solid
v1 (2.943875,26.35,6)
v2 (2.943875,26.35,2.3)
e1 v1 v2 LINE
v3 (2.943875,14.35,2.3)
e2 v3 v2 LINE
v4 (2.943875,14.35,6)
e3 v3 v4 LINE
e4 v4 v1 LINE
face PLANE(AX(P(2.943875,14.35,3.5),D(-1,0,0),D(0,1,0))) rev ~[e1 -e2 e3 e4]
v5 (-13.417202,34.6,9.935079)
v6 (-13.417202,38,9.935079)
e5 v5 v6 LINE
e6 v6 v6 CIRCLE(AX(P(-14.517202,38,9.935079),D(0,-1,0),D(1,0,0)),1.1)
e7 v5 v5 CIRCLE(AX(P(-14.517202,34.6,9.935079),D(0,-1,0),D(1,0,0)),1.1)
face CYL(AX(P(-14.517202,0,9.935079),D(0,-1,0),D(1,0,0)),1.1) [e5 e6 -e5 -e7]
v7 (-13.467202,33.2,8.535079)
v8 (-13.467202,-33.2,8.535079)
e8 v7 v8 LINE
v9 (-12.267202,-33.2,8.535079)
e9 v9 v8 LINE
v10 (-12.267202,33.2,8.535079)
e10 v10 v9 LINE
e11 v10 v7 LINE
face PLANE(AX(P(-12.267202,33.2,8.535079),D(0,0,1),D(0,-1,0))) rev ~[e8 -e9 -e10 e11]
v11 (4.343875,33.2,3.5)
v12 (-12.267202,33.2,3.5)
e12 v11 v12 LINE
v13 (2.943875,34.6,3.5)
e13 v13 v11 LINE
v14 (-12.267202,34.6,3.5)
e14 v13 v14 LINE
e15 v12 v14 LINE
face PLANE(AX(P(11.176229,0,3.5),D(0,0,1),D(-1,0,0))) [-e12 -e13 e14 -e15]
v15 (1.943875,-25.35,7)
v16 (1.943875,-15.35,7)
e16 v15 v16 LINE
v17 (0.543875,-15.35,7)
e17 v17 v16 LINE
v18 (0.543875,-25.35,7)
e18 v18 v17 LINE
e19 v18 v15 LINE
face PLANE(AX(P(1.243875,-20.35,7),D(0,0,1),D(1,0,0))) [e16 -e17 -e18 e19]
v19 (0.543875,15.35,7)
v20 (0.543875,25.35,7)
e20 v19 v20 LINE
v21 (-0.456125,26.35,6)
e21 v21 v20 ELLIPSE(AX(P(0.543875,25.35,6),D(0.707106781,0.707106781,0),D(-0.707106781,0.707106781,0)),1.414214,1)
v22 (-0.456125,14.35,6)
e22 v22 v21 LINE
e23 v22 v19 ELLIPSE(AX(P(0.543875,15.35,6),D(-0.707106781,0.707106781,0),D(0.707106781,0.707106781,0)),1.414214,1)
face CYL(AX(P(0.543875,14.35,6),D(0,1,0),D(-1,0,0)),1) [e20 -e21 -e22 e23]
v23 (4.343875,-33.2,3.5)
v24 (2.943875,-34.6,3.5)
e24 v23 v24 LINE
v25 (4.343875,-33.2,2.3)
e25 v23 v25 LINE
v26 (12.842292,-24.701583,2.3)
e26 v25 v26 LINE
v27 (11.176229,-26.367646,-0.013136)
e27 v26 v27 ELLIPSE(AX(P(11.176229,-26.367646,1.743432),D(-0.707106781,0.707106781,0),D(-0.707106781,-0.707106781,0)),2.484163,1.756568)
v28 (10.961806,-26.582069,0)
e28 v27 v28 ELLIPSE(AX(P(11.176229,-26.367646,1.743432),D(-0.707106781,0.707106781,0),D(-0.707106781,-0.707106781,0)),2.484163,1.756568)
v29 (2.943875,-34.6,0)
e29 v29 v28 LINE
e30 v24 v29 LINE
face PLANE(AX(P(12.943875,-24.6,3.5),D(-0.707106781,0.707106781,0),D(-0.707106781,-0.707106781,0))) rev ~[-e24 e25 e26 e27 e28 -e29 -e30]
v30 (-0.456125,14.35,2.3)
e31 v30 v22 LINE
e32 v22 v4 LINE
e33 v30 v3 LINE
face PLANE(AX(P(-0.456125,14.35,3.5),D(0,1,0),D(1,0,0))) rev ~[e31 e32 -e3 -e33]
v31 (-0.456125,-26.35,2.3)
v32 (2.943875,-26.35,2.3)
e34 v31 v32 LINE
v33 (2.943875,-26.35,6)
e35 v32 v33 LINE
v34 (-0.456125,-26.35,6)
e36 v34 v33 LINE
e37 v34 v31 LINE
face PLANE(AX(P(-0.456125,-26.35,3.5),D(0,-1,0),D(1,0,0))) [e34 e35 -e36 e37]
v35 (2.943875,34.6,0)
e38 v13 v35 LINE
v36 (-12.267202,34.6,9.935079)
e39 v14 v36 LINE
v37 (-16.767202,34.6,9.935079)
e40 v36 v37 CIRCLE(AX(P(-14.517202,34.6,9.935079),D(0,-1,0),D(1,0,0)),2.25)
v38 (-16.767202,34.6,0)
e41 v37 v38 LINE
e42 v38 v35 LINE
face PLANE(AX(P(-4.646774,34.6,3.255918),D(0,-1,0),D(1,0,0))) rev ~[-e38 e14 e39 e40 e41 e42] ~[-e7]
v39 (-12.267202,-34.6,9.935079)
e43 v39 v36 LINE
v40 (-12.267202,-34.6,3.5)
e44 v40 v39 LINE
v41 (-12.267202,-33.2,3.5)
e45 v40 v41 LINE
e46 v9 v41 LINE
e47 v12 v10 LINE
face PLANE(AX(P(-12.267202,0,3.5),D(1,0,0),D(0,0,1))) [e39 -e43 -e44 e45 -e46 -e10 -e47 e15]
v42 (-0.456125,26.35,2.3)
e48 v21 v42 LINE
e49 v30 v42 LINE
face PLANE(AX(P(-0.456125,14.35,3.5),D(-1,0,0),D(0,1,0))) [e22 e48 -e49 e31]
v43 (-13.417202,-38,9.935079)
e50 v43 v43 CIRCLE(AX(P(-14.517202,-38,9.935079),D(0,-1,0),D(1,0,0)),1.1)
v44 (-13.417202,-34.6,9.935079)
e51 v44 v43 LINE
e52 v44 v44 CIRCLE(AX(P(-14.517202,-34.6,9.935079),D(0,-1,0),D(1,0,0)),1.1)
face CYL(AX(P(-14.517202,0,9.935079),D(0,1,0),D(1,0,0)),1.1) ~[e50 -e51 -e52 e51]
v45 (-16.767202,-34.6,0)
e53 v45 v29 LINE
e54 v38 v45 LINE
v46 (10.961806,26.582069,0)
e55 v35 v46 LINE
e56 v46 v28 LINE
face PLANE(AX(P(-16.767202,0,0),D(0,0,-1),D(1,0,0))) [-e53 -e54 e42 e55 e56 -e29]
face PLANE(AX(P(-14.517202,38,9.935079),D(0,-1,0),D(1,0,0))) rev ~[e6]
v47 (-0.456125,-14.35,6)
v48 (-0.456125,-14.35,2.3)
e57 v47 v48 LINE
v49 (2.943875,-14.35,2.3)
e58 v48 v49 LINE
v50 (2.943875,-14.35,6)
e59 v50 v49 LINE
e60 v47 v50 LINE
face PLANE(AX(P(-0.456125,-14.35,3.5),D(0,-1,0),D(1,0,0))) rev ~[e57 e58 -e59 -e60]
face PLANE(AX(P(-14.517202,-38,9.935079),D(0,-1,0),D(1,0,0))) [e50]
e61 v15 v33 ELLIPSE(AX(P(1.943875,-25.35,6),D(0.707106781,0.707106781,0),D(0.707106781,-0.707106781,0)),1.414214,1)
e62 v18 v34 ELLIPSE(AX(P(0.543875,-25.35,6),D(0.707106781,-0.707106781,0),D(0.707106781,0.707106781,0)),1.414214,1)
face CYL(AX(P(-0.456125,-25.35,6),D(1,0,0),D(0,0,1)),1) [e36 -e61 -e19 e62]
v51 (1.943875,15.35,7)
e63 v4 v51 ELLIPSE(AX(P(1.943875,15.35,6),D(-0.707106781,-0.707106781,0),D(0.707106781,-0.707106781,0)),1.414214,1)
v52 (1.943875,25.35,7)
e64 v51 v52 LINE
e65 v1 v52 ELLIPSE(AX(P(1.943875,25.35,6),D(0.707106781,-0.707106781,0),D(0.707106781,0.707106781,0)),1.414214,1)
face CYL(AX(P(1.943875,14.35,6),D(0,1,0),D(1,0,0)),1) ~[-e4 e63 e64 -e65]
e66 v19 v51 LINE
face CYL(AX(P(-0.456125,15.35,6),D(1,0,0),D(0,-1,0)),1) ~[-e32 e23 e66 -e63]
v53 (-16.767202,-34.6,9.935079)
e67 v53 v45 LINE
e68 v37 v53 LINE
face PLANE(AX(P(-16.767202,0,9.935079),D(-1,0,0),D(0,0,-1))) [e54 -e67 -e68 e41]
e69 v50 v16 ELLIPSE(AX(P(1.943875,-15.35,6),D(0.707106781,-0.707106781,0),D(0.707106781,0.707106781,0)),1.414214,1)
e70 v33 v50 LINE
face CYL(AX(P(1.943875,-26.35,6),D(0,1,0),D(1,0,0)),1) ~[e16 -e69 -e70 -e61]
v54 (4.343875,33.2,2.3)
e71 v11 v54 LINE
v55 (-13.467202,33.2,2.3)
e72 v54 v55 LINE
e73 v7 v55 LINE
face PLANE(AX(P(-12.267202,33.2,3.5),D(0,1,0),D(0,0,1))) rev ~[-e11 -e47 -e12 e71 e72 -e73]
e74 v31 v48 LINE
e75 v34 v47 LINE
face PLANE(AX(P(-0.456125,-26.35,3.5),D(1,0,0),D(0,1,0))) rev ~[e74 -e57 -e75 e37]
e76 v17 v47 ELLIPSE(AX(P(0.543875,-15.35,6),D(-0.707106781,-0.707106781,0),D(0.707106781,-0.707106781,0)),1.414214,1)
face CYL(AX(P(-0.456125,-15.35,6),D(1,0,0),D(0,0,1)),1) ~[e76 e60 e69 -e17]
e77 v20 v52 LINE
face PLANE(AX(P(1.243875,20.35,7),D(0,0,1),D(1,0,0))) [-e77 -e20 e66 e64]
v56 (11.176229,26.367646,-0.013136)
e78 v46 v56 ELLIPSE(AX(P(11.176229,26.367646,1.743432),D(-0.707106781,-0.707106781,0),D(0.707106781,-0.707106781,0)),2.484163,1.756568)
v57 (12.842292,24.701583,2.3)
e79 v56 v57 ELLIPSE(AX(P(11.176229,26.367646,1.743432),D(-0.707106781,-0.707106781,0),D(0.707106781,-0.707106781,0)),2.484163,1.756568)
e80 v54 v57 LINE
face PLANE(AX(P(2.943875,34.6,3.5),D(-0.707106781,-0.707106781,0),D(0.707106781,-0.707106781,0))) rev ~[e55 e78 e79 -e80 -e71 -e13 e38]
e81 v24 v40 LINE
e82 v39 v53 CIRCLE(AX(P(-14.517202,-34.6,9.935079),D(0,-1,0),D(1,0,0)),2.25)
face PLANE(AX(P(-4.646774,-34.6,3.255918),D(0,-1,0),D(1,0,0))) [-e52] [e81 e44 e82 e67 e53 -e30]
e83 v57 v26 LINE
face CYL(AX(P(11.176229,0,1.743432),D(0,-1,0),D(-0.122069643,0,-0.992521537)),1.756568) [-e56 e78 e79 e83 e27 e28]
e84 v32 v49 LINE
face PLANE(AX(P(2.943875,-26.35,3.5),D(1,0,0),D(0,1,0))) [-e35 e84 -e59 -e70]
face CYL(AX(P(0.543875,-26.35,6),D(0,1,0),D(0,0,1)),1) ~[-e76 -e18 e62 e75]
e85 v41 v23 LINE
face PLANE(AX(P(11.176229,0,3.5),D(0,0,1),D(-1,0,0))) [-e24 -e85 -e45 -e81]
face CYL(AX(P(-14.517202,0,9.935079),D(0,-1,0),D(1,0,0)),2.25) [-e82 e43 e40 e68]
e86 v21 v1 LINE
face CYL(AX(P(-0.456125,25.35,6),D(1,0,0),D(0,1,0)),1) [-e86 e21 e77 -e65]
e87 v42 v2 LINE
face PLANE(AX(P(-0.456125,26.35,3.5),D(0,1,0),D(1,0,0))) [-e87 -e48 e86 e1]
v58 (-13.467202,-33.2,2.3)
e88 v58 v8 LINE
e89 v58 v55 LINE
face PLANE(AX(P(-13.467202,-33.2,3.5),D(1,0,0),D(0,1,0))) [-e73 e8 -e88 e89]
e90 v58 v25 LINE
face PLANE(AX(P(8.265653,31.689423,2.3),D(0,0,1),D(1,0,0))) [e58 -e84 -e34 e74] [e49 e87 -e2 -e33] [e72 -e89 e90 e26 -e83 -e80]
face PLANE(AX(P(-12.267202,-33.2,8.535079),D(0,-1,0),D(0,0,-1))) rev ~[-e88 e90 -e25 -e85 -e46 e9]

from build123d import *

# Parameters (mm, degrees)
F0_R          = 1.1
F1_DEPTH      = 34.6
F1_DEPTH_BACK = 34.6
F2_DEPTH      = 38
F2_DEPTH_BACK = 38
F4_DEPTH      = 1.2
F5_W          = 3.4
F5_H          = 12
F5_W_2        = 1.2
F5_H_2        = 66.4
F6_DEPTH      = 1.2
F7_DEPTH      = 5
F7_DEPTH_BACK = 5
F8_DEPTH      = 3.5
F9_R          = 1


# Not quite as in the source:
# - a pattern or mirror of a feature is missing from the dataset's text; its kind, count and spacing are read off the source's solid
# - a feature names something its author has since deleted; it is built from what else it names


with BuildPart() as f1:
    # F0 (on Front) → F1 (new body, two sides)
    with BuildSketch(Plane.XZ) as f1_sk:
        with BuildLine():
            ThreePointArc((-12.2672023306, 9.9350791425), (-14.5172023306, 12.1850791425), (-16.7672023306, 9.9350791425))
            Line((-16.7672023306, 9.9350791425), (-16.7672023306, 0))
            Line((-16.7672023306, 0), (10.9618057992, 0))
            ThreePointArc((10.9618057992, 0), (12.9295104862, 1.6360189486), (11.1762294546, 3.5))
            Line((11.1762294546, 3.5), (-12.2672023306, 3.5))
            Line((-12.2672023306, 3.5), (-12.2672023306, 9.9350791425))
        make_face()
        with Locations((-14.5172023306, 9.9350791425)):
            Circle(F0_R, mode=Mode.SUBTRACT)
    extrude(amount=F1_DEPTH)
    extrude(f1_sk.sketch, amount=-F1_DEPTH_BACK)

    # F0 (on Front) → F2 (join, two sides)
    with BuildSketch(Plane.XZ) as f2_sk:
        with Locations((-14.5172023306, 9.9350791425)):
            Circle(F0_R)
    extrude(amount=F2_DEPTH)
    extrude(f2_sk.sketch, amount=-F2_DEPTH_BACK)

    # F3 (on face) → F4 (cut)
    with BuildSketch(Plane.YZ.offset(-12.2672023306)):
        Polygon((-33.2, 4.5), (-33.2, 3.5), (33.2, 3.5), (33.2, 8.5350791425), (-33.2, 8.5350791425), align=None)
    extrude(amount=-F4_DEPTH, mode=Mode.SUBTRACT)

    # F5 (on face) → F6 (cut)
    with BuildSketch(Plane.XY.offset(3.5)):
        Polygon((11.1762294546, 34.6), (2.9438750446, 34.6), (4.3438750446, 33.2), (11.1762294546, 26.36764559), align=None)
        Polygon((4.3438750446, 33.2), (-12.2672023306, 33.2), (-12.2672023306, -33.2), (4.3438750446, -33.2), (11.1762294546, -26.36764559), (11.1762294546, 26.36764559), align=None)
        with Locations((1.2438750446, -20.35)):
            Rectangle(F5_W, F5_H, mode=Mode.SUBTRACT)
        with Locations((1.2438750446, 20.35)):
            Rectangle(F5_W, F5_H, mode=Mode.SUBTRACT)
        with Locations((-12.8672023306, 0)):
            Rectangle(F5_W_2, F5_H_2)
        Polygon((12.9438750446, 24.6), (11.1762294546, 26.36764559), (11.1762294546, -26.36764559), (12.9438750446, -24.6), align=None)
    extrude(amount=-F6_DEPTH, mode=Mode.SUBTRACT)

    # F5 (on face) → F7 (cut, two sides)
    with BuildSketch(Plane.XY.offset(3.5)) as f7_sk:
        Polygon((12.9438750446, 34.6), (11.1762294546, 34.6), (11.1762294546, 26.36764559), (12.9438750446, 24.6), align=None)
        Polygon((12.9438750446, -24.6), (11.1762294546, -26.36764559), (11.1762294546, -34.6), (12.9438750446, -34.6), align=None)
        Polygon((11.1762294546, -26.36764559), (4.3438750446, -33.2), (2.9438750446, -34.6), (11.1762294546, -34.6), align=None)
    f7 = extrude(amount=-F7_DEPTH, mode=Mode.SUBTRACT) + extrude(f7_sk.sketch, amount=F7_DEPTH_BACK, mode=Mode.SUBTRACT)

    # F7_copies: F7 across plane
    add(f7.mirror(Plane.ZX), mode=Mode.SUBTRACT)

    # F5 (on face) → F8 (join)
    with BuildSketch(Plane.XY.offset(3.5)):
        with Locations((1.2438750446, 20.35)):
            Rectangle(F5_W, F5_H)
        with Locations((1.2438750446, -20.35)):
            Rectangle(F5_W, F5_H)
    extrude(amount=F8_DEPTH)

    # F9
    f9_edges = [f1.edges().sort_by_distance(p)[0] for p in [
        (1.243875, -26.35, 7),
        (2.943875, -20.35, 7),
        (1.243875, -14.35, 7),
        (-0.456125, -20.35, 7),
        (-0.456125, 20.35, 7),
        (1.243875, 14.35, 7),
        (2.943875, 20.35, 7),
        (1.243875, 26.35, 7),
    ]]
    fillet(f9_edges, radius=F9_R)


solid = f1.part
